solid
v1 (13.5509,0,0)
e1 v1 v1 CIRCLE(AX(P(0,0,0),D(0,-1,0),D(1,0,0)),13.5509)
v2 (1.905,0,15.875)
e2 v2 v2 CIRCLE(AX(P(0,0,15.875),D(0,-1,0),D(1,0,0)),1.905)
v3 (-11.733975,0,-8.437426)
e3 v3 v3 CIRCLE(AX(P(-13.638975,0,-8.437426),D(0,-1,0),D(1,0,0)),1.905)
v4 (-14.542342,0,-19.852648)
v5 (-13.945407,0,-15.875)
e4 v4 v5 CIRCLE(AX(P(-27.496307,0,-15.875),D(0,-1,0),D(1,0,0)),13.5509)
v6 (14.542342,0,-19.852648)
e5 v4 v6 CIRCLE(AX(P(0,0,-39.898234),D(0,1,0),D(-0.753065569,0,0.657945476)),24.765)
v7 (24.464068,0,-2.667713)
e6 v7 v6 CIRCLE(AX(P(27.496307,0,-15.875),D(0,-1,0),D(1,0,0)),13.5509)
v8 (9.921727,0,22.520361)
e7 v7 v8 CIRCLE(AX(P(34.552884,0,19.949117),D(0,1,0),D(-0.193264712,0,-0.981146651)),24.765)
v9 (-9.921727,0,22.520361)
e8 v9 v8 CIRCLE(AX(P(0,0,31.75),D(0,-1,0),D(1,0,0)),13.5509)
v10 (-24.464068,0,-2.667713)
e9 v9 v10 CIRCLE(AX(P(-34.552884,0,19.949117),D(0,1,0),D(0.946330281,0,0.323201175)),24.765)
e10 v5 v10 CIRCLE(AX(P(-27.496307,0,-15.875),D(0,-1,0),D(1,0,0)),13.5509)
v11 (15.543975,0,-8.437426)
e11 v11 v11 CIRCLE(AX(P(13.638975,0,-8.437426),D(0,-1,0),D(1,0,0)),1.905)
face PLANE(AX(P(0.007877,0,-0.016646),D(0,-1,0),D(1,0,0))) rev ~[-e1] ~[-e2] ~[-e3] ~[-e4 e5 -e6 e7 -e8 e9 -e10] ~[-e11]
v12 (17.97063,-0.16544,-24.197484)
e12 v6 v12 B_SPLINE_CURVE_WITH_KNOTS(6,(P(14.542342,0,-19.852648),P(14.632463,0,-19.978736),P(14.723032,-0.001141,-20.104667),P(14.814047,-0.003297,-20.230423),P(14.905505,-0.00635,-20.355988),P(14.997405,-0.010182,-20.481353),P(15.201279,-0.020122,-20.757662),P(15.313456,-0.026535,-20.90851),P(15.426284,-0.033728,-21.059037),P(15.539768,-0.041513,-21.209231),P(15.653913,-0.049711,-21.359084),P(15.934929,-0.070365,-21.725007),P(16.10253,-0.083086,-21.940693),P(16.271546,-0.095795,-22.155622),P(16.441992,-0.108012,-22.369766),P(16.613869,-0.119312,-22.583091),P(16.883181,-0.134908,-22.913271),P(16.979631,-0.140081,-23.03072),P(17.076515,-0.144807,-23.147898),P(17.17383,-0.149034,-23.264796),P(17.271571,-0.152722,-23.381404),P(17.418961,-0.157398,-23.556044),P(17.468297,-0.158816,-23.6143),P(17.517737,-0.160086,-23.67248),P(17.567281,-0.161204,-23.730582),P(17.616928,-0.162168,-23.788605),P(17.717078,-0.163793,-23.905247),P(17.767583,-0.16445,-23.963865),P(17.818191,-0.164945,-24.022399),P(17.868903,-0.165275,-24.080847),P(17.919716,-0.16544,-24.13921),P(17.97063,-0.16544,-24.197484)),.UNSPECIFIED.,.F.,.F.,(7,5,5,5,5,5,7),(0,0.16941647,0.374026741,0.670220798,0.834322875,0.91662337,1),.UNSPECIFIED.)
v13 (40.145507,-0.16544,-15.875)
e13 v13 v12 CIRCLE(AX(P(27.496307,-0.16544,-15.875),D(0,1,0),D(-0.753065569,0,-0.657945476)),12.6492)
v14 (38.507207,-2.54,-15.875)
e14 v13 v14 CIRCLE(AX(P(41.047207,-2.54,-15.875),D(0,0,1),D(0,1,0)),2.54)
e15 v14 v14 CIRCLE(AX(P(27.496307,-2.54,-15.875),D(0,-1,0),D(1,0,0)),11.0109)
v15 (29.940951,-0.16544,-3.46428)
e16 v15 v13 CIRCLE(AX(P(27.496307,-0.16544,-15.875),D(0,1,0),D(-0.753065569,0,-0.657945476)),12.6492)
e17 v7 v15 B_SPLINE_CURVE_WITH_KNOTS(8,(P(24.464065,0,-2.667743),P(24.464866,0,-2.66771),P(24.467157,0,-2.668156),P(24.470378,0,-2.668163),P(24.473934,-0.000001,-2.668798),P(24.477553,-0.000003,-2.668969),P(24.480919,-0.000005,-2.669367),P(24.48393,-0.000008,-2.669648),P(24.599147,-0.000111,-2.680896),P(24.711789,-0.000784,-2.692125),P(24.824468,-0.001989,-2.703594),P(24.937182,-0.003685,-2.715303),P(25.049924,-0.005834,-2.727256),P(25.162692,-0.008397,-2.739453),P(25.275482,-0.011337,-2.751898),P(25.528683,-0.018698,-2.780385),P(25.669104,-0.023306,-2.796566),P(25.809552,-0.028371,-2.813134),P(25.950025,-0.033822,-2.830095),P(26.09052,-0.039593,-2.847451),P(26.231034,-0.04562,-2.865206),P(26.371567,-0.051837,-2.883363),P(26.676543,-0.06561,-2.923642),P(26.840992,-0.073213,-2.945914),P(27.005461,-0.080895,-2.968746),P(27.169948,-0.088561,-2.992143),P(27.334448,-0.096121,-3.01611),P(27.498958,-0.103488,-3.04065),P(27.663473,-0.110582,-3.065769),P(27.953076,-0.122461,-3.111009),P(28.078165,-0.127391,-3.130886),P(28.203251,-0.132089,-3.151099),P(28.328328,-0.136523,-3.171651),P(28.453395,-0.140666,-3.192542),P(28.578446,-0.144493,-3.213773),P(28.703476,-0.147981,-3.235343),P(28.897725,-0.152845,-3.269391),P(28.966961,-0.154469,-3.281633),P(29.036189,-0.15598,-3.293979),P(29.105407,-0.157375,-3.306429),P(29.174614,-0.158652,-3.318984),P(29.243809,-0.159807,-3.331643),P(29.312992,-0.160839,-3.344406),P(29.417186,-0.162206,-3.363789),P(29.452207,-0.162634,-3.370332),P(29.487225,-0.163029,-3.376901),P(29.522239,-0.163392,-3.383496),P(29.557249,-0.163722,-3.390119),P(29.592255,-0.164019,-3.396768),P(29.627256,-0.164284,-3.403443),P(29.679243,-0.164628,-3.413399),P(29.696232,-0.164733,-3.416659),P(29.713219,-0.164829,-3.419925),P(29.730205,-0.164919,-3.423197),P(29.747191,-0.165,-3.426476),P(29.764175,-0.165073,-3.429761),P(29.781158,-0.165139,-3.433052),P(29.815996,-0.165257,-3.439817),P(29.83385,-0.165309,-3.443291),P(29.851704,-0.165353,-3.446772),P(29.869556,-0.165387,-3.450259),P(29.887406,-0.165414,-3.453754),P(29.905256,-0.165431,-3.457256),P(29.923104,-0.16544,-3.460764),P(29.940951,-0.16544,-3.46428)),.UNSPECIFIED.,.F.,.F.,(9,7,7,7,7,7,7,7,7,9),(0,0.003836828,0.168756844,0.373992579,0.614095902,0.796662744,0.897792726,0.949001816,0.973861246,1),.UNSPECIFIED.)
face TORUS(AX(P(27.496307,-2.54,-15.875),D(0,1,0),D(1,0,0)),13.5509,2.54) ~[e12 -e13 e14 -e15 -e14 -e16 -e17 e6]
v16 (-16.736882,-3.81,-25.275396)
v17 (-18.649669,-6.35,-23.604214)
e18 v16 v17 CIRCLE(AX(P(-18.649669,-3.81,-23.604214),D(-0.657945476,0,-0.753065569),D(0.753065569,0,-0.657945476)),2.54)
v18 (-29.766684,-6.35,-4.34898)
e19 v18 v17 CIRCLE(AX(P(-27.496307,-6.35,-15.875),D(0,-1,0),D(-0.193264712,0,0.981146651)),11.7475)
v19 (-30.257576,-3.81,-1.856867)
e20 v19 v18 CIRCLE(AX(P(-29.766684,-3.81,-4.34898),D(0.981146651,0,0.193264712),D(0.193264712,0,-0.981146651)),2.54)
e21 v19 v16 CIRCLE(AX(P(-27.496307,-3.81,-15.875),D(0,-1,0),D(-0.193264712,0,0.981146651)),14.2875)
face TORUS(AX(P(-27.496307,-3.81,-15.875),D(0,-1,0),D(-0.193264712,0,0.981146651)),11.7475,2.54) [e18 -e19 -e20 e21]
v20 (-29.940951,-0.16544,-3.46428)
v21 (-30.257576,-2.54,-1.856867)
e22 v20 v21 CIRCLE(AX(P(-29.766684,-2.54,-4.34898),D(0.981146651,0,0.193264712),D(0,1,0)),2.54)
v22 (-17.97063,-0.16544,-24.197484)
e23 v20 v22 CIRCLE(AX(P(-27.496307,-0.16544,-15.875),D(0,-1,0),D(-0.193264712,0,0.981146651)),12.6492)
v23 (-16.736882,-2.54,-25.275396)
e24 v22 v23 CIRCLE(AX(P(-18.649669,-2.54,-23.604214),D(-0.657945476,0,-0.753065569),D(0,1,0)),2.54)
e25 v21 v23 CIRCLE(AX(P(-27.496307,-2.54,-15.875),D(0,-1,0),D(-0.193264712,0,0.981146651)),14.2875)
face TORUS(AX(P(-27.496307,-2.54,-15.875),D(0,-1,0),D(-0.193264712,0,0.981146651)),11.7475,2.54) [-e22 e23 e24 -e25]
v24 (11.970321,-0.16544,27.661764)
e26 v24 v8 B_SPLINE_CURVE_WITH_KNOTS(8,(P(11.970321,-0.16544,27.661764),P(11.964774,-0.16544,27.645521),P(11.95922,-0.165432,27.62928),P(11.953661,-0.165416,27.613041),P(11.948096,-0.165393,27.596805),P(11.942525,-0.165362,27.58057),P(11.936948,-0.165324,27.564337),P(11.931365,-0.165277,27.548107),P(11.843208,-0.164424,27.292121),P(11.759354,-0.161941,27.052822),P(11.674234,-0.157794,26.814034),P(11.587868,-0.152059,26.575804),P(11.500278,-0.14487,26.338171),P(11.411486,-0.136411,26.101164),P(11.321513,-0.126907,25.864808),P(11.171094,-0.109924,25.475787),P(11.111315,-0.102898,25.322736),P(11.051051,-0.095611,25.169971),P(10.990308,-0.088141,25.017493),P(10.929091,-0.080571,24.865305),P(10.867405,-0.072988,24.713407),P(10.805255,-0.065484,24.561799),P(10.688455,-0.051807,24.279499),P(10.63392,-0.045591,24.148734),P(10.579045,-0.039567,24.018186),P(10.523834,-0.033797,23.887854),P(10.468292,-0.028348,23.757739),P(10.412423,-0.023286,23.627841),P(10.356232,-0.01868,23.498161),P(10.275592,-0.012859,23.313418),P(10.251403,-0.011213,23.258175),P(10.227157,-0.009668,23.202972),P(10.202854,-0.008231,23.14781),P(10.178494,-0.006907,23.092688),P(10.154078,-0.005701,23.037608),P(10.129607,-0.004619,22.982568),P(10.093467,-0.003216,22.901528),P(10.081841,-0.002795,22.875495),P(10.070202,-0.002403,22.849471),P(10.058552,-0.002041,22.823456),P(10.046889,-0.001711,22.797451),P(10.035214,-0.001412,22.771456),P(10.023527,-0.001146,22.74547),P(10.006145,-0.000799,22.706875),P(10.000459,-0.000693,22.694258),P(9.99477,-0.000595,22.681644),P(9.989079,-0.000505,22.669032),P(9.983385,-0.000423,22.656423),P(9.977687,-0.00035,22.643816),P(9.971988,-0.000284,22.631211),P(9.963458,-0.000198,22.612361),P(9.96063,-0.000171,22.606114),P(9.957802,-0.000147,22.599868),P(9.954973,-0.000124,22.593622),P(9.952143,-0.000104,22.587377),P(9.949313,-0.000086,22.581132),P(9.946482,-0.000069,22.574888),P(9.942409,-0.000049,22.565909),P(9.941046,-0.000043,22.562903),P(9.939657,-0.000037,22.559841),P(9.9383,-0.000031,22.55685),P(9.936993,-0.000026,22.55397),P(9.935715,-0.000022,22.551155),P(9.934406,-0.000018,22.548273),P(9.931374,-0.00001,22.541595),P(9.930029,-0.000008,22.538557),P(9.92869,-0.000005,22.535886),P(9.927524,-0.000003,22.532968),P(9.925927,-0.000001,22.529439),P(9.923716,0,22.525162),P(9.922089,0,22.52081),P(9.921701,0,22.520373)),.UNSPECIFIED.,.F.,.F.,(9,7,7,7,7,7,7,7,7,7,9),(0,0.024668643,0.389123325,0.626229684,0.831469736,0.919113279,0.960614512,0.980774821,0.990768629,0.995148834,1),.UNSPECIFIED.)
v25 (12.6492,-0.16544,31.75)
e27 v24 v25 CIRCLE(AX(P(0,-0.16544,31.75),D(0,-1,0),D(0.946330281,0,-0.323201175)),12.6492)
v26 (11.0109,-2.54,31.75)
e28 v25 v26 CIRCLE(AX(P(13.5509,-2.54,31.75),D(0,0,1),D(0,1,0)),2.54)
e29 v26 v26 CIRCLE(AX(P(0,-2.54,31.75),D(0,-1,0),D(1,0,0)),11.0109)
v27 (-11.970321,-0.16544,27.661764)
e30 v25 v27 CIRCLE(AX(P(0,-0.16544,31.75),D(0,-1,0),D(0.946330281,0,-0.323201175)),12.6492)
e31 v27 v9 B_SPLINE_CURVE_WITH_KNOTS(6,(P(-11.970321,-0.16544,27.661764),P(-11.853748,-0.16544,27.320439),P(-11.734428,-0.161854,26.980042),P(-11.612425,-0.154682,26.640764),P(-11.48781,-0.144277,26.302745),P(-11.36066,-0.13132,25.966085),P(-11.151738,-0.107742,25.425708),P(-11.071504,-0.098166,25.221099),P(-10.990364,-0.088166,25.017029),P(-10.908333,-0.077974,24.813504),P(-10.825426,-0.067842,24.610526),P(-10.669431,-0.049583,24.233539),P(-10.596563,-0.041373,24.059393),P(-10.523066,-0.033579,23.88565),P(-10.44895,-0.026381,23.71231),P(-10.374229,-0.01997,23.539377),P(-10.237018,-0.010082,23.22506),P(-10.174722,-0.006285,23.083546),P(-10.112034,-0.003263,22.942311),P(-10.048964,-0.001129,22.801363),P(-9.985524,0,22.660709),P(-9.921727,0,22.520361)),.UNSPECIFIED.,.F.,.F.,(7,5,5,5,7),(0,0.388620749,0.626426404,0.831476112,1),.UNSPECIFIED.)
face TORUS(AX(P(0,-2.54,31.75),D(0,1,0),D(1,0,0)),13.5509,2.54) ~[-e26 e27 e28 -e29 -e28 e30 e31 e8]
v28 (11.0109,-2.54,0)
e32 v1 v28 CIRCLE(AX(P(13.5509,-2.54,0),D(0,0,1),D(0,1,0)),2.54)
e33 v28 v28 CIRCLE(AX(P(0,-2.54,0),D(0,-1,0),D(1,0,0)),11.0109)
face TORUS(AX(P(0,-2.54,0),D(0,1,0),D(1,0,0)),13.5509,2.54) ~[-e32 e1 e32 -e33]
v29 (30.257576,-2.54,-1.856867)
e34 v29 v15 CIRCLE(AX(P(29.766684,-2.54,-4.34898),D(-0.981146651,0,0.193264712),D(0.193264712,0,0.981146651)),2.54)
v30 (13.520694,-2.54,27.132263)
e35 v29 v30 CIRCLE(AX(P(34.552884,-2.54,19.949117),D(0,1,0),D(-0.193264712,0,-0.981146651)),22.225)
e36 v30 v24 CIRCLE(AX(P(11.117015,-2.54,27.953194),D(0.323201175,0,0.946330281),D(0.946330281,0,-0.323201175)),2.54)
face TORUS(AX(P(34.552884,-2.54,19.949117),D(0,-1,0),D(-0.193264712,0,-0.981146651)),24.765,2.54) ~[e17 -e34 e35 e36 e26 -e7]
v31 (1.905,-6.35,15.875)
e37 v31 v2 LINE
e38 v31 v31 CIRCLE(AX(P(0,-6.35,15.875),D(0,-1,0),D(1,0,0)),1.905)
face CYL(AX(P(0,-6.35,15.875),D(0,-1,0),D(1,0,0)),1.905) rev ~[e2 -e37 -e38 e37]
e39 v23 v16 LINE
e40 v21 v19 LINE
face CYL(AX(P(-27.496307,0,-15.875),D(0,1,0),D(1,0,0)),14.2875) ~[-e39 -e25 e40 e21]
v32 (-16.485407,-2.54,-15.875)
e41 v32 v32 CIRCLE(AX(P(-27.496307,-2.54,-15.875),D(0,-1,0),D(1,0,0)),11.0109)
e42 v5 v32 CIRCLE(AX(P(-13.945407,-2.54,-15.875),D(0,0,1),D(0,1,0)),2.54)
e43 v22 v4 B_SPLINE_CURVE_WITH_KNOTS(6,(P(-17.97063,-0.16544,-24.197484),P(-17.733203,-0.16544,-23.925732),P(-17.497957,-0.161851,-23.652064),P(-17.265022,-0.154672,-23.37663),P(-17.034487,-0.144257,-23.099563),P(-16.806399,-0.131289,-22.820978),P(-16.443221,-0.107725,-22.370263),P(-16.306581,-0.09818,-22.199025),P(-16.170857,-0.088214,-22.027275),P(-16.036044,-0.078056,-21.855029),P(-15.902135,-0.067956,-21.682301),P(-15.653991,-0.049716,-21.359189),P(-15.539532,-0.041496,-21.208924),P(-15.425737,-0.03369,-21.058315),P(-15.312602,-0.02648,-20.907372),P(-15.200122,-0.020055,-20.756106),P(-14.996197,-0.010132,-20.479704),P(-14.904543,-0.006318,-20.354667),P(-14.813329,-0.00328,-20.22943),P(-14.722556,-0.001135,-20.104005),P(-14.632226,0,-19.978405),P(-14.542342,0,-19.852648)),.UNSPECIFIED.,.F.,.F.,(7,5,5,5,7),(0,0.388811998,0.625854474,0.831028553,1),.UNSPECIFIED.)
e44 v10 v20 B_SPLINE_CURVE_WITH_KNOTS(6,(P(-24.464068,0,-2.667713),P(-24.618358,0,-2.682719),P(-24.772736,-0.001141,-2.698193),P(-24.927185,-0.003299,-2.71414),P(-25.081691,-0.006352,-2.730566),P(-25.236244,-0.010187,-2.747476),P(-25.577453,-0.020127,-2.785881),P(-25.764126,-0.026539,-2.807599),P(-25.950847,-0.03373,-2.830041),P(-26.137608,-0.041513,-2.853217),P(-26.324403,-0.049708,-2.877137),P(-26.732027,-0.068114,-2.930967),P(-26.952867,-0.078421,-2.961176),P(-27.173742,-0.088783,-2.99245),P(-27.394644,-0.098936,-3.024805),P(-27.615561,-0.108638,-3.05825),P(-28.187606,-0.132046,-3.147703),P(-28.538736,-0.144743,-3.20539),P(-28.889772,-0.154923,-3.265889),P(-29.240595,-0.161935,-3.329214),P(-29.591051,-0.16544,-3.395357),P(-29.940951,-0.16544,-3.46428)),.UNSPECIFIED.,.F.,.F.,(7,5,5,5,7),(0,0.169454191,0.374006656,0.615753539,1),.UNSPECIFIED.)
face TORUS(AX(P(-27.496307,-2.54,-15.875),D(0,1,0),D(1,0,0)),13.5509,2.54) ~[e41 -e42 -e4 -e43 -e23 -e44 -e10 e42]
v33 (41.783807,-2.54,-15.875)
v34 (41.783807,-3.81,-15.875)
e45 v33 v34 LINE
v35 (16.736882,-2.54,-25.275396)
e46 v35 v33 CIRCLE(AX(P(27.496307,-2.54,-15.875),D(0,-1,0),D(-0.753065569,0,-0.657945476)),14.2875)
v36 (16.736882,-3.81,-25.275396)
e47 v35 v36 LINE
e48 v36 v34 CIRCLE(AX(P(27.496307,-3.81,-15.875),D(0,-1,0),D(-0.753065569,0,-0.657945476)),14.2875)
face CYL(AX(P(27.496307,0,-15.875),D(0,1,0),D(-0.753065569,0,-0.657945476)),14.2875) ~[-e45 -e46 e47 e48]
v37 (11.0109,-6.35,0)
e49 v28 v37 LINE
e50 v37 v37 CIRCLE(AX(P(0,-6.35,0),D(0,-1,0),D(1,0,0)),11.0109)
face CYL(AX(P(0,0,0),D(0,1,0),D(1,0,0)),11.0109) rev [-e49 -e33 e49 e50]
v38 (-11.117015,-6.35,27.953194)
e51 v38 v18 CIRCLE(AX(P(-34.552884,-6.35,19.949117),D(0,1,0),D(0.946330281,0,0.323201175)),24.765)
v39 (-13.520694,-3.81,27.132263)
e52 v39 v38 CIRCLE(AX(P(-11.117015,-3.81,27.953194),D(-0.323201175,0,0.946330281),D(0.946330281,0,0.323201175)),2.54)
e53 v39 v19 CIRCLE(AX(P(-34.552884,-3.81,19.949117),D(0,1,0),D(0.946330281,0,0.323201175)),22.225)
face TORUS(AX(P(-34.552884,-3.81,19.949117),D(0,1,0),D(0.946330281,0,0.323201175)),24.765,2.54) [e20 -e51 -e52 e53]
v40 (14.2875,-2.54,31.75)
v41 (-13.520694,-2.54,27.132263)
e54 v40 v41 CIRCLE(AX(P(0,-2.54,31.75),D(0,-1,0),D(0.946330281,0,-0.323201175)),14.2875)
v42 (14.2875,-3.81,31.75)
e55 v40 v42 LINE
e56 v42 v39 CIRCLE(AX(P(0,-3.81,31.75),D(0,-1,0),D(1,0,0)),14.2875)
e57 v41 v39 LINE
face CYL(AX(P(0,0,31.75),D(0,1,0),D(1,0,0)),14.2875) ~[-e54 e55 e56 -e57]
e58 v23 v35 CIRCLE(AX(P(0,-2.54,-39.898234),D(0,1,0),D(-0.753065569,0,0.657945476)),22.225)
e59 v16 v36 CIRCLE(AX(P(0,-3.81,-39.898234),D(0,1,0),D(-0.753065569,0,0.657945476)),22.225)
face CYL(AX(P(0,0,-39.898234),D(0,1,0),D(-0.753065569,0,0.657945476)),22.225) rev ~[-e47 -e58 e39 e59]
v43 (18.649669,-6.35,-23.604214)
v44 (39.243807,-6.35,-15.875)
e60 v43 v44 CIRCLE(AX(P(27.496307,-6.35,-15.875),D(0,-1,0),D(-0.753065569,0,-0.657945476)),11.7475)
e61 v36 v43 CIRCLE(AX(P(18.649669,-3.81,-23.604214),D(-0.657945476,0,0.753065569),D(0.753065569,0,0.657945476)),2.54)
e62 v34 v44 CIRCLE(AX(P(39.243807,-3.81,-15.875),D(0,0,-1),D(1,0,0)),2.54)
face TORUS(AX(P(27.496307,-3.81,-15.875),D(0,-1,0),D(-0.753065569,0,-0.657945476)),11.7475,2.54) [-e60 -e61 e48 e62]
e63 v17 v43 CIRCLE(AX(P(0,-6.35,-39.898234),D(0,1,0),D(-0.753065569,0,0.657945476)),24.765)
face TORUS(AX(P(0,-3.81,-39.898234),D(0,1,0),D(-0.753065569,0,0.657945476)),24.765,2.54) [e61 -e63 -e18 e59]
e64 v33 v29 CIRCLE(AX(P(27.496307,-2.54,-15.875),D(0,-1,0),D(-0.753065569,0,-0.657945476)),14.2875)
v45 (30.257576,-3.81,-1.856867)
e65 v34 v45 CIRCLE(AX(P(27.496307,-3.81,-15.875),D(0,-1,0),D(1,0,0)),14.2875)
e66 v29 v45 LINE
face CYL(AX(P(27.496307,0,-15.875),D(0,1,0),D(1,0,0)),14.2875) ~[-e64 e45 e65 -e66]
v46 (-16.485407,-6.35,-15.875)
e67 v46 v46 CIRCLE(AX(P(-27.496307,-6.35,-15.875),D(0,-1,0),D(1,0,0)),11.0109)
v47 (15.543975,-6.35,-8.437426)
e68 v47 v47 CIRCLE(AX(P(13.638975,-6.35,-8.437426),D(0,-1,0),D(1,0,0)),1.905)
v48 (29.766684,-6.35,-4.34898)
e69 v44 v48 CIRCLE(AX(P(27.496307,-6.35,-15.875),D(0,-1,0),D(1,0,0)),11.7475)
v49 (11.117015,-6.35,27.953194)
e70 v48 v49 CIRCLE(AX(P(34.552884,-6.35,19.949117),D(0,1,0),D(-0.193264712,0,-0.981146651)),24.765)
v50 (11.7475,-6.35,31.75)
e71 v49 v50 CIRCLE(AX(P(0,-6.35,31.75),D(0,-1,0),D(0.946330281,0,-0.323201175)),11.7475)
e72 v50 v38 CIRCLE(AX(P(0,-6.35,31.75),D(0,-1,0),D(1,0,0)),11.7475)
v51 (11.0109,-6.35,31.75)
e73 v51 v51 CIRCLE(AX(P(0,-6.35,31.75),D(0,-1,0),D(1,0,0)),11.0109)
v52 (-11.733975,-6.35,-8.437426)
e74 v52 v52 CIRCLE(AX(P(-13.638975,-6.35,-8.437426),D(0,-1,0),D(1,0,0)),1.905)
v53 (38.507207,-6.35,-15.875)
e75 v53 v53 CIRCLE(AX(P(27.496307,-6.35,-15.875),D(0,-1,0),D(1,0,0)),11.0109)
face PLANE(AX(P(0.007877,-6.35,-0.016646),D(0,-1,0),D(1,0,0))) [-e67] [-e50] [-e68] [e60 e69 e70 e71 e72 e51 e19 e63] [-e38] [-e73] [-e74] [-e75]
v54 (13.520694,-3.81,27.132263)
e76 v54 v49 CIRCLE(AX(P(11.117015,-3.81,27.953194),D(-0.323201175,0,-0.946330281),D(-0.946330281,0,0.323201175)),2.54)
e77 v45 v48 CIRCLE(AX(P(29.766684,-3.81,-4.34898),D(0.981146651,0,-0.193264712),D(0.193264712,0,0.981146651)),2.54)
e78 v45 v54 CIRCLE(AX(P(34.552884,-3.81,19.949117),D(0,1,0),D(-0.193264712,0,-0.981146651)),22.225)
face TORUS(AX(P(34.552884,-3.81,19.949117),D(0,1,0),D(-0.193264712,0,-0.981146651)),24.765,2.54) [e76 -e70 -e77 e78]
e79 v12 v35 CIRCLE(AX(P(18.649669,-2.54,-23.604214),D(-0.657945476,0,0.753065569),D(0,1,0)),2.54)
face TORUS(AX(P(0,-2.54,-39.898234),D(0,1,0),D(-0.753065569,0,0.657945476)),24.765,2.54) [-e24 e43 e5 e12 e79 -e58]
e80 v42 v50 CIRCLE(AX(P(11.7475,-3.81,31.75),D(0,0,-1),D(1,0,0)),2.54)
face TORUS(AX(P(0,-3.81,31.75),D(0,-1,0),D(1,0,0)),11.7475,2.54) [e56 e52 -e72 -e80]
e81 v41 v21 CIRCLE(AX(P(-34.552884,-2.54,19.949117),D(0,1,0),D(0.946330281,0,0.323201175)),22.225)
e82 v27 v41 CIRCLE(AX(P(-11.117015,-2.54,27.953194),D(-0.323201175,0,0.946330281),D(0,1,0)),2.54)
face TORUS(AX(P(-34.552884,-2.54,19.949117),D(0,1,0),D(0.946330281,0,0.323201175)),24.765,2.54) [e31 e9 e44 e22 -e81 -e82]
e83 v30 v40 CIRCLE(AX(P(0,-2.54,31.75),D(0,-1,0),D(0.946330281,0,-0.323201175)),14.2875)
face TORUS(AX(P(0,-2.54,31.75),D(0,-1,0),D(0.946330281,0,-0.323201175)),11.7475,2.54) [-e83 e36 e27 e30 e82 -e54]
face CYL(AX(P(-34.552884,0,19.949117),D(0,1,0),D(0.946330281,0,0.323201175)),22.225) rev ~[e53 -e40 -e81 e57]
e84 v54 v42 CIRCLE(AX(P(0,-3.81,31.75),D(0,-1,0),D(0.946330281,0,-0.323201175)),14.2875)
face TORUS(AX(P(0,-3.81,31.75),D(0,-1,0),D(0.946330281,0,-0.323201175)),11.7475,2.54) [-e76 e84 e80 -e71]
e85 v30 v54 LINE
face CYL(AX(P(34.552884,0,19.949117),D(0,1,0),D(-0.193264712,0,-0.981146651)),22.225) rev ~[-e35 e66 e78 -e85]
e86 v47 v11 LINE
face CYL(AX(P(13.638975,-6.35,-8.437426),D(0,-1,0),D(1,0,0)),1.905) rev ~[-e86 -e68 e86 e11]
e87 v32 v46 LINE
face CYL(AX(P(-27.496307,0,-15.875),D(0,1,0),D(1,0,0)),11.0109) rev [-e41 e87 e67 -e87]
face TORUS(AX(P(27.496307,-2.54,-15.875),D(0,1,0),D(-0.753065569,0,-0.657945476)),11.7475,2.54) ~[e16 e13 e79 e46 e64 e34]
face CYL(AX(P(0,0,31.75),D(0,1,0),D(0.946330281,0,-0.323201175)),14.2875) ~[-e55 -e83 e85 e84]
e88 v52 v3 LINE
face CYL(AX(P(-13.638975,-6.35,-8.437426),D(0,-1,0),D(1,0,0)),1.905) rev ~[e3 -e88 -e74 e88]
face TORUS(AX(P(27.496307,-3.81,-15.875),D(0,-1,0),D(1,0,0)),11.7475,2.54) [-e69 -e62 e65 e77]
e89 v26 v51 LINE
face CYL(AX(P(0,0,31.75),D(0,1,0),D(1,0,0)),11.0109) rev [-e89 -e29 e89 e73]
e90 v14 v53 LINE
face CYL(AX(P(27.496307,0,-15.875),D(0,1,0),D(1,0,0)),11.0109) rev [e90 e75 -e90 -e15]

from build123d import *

# Parameters (mm, degrees)
F0_R         = 14.2875
F0_R_2       = 11.0109
F1_DEPTH     = 6.35
F2_R         = 2.54
F3_T2_ANGLE  = 97.7132585674
F3_T4_ANGLE  = 217.7132585674
F3_T6_ANGLE  = 97.7132585674
F3_T8_ANGLE  = 217.7132585674
F3_T10_ANGLE = 97.7132585674
F3_T12_ANGLE = 217.7132585674
F4_R         = 1.905
F5_DEPTH     = 25.4


# Not quite as in the source:
# - a fillet or chamfer that OpenCascade refuses, or shapes differently, is made with other operations: its cross-section is extruded or revolved along the edge and cut away or added


with BuildPart() as f1:
    # F0 (on Front) → F1 (new body)
    with BuildSketch(Plane.XZ):
        with BuildLine():
            ThreePointArc((13.5206938879, 27.1322632123), (0, 17.4625), (-13.5206938879, 27.1322632123))
            ThreePointArc((-13.5206938879, 27.1322632123), (-15.305469781, 8.8366170981), (-30.257576148, -1.8568672225))
            ThreePointArc((-30.257576148, -1.8568672225), (-18.4221394691, -4.8390520266), (-13.2088065702, -15.875))
            ThreePointArc((-13.2088065702, -15.875), (-14.1198733557, -20.8953277493), (-16.7368822601, -25.2753959899))
            ThreePointArc((-16.7368822601, -25.2753959899), (0, -17.6732341963), (16.7368822601, -25.2753959899))
            ThreePointArc((16.7368822601, -25.2753959899), (15.1229686136, -8.73125), (30.257576148, -1.8568672225))
            ThreePointArc((30.257576148, -1.8568672225), (15.305469781, 8.8366170981), (13.5206938879, 27.1322632123))
        make_face()
        Circle(F0_R, mode=Mode.SUBTRACT)
        with BuildLine():
            ThreePointArc((-13.2088065702, -15.875), (-18.4221394691, -4.8390520266), (-30.257576148, -1.8568672225))
            ThreePointArc((-30.257576148, -1.8568672225), (-39.8696445267, -23.01875), (-16.7368822601, -25.2753959899))
            ThreePointArc((-16.7368822601, -25.2753959899), (-14.1198733557, -20.8953277493), (-13.2088065702, -15.875))
        make_face()
        with Locations((-27.4963065702, -15.875)):
            Circle(F0_R_2, mode=Mode.SUBTRACT)
        Circle(F0_R)
        Circle(F0_R_2, mode=Mode.SUBTRACT)
        with BuildLine():
            ThreePointArc((41.7838065702, -15.875), (38.5322545436, -6.8008328989), (30.257576148, -1.8568672225))
            ThreePointArc((30.257576148, -1.8568672225), (15.1229686136, -8.73125), (16.7368822601, -25.2753959899))
            ThreePointArc((16.7368822601, -25.2753959899), (32.5166343194, -29.2514332144), (41.7838065702, -15.875))
        make_face()
        with Locations((27.4963065702, -15.875)):
            Circle(F0_R_2, mode=Mode.SUBTRACT)
        with BuildLine():
            ThreePointArc((13.5206938879, 27.1322632123), (14.0944948503, 29.409514759), (14.2875, 31.75))
            ThreePointArc((14.2875, 31.75), (-2.340485241, 45.8444948503), (-13.5206938879, 27.1322632123))
            ThreePointArc((-13.5206938879, 27.1322632123), (0, 17.4625), (13.5206938879, 27.1322632123))
        make_face()
        with Locations((0, 31.75)):
            Circle(F0_R_2, mode=Mode.SUBTRACT)
    extrude(amount=F1_DEPTH)

    # F2
    f2_edges = [f1.edges().sort_by_distance(p)[0] for p in [
        (-15.30547, -6.35, 8.836617),
    ]]
    fillet(f2_edges, radius=F2_R)

    # F3: fillet of radius 2.54 on 10 edges, made by hand

    # F3_s1 → F3_t2 (revolve, cut)
    with BuildSketch(Plane(origin=(29.4795189524, 0, -5.8068289225), x_dir=(0, 1, 0), z_dir=(0.9811466511, 0, -0.1932647124))):
        with BuildLine():
            ThreePointArc((-2.54, 4.025862694), (-0.7439487758, 3.2819139183), (0, 1.485862694))
            Line((0, 1.485862694), (0, 4.025862694))
            Line((0, 4.025862694), (-2.54, 4.025862694))
        make_face()
    revolve(axis=Axis((34.5528843801, 0, 19.9491170981), (0, 1, 0)), revolution_arc=F3_T2_ANGLE, mode=Mode.SUBTRACT)

    # F3_s3 → F3_t4 (revolve, cut)
    with BuildSketch(Plane(origin=(9.7108981139, 0, 28.4334267654), x_dir=(0, 1, 0), z_dir=(-0.323201175, 0, -0.9463302809))):
        with BuildLine():
            ThreePointArc((0, 1.485862694), (-0.7439487758, 3.2819139183), (-2.54, 4.025862694))
            Line((-2.54, 4.025862694), (0, 4.025862694))
            Line((0, 4.025862694), (0, 1.485862694))
        make_face()
    revolve(axis=Axis((0, 0, 31.75), (0, -1, 0)), revolution_arc=F3_T4_ANGLE, mode=Mode.SUBTRACT)

    # F3_s5 → F3_t6 (revolve, cut)
    with BuildSketch(Plane(origin=(-9.7108981139, 0, 28.4334267654), x_dir=(0, 1, 0), z_dir=(-0.323201175, 0, 0.9463302809))):
        with BuildLine():
            ThreePointArc((0, 1.485862694), (-0.7439487758, 3.2819139183), (-2.54, 4.025862694))
            Line((-2.54, 4.025862694), (0, 4.025862694))
            Line((0, 4.025862694), (0, 1.485862694))
        make_face()
    revolve(axis=Axis((-34.5528843801, 0, 19.9491170981), (0, 1, 0)), revolution_arc=F3_T6_ANGLE, mode=Mode.SUBTRACT)

    # F3_s7 → F3_t8 (revolve, cut)
    with BuildSketch(Plane(origin=(-29.4795189524, 0, -5.8068289225), x_dir=(0, 1, 0), z_dir=(0.9811466511, 0, 0.1932647124))):
        with BuildLine():
            ThreePointArc((0, 1.485862694), (-0.7439487758, 3.2819139183), (-2.54, 4.025862694))
            Line((-2.54, 4.025862694), (0, 4.025862694))
            Line((0, 4.025862694), (0, 1.485862694))
        make_face()
    revolve(axis=Axis((-27.4963065702, 0, -15.875), (0, -1, 0)), revolution_arc=F3_T8_ANGLE, mode=Mode.SUBTRACT)

    # F3_s9 → F3_t10 (revolve, cut)
    with BuildSketch(Plane(origin=(-19.7686208385, 0, -22.6265978429), x_dir=(0, 1, 0), z_dir=(-0.6579454761, 0, -0.7530655685))):
        with BuildLine():
            ThreePointArc((0, 1.485862694), (-0.7439487758, 3.2819139183), (-2.54, 4.025862694))
            Line((-2.54, 4.025862694), (0, 4.025862694))
            Line((0, 4.025862694), (0, 1.485862694))
        make_face()
    revolve(axis=Axis((0, 0, -39.8982341963), (0, 1, 0)), revolution_arc=F3_T10_ANGLE, mode=Mode.SUBTRACT)

    # F3_s11 → F3_t12 (revolve, cut)
    with BuildSketch(Plane(origin=(19.7686208385, 0, -22.6265978429), x_dir=(0, 1, 0), z_dir=(-0.6579454761, 0, 0.7530655685))):
        with BuildLine():
            ThreePointArc((-2.54, 4.025862694), (-0.7439487758, 3.2819139183), (0, 1.485862694))
            Line((0, 1.485862694), (0, 4.025862694))
            Line((0, 4.025862694), (-2.54, 4.025862694))
        make_face()
    revolve(axis=Axis((27.4963065702, 0, -15.875), (0, -1, 0)), revolution_arc=F3_T12_ANGLE, mode=Mode.SUBTRACT)

    # F3_s13 → F3_t14 (revolve, cut)
    with BuildSketch(Plane.XY.offset(-15.875)):
        with BuildLine():
            ThreePointArc((-13.9454065702, 0), (-15.7414577944, -0.7439487758), (-16.4854065702, -2.54))
            Line((-16.4854065702, -2.54), (-16.4854065702, 0))
            Line((-16.4854065702, 0), (-13.9454065702, 0))
        make_face()
    revolve(axis=Axis((-27.4963065702, 0, -15.875), (0, -1, 0)), mode=Mode.SUBTRACT)

    # F3_s15 → F3_t16 (revolve, cut)
    with BuildSketch(Plane.XY):
        with BuildLine():
            ThreePointArc((13.5509, 0), (11.7548487758, -0.7439487758), (11.0109, -2.54))
            Line((11.0109, -2.54), (11.0109, 0))
            Line((11.0109, 0), (13.5509, 0))
        make_face()
    revolve(axis=Axis((0, 0, 0), (0, -1, 0)), mode=Mode.SUBTRACT)

    # F3_s17 → F3_t18 (revolve, cut)
    with BuildSketch(Plane.XY.offset(-15.875)):
        with BuildLine():
            ThreePointArc((41.0472065702, 0), (39.2511553459, -0.7439487758), (38.5072065702, -2.54))
            Line((38.5072065702, -2.54), (38.5072065702, 0))
            Line((38.5072065702, 0), (41.0472065702, 0))
        make_face()
    revolve(axis=Axis((27.4963065702, 0, -15.875), (0, -1, 0)), mode=Mode.SUBTRACT)

    # F3_s19 → F3_t20 (revolve, cut)
    with BuildSketch(Plane.XY.offset(31.75)):
        with BuildLine():
            ThreePointArc((13.5509, 0), (11.7548487758, -0.7439487758), (11.0109, -2.54))
            Line((11.0109, -2.54), (11.0109, 0))
            Line((11.0109, 0), (13.5509, 0))
        make_face()
    revolve(axis=Axis((0, 0, 31.75), (0, -1, 0)), mode=Mode.SUBTRACT)

    # F4 (on face) → F5 (cut)
    with BuildSketch(Plane.XZ.offset(6.35)):
        with Locations((-13.6389745453, -8.4374256665)):
            Circle(F4_R)
        with Locations((13.6389745453, -8.4374256665)):
            Circle(F4_R)
        with Locations((0, 15.875)):
            Circle(F4_R)
    extrude(amount=-F5_DEPTH, mode=Mode.SUBTRACT)


solid = f1.part
